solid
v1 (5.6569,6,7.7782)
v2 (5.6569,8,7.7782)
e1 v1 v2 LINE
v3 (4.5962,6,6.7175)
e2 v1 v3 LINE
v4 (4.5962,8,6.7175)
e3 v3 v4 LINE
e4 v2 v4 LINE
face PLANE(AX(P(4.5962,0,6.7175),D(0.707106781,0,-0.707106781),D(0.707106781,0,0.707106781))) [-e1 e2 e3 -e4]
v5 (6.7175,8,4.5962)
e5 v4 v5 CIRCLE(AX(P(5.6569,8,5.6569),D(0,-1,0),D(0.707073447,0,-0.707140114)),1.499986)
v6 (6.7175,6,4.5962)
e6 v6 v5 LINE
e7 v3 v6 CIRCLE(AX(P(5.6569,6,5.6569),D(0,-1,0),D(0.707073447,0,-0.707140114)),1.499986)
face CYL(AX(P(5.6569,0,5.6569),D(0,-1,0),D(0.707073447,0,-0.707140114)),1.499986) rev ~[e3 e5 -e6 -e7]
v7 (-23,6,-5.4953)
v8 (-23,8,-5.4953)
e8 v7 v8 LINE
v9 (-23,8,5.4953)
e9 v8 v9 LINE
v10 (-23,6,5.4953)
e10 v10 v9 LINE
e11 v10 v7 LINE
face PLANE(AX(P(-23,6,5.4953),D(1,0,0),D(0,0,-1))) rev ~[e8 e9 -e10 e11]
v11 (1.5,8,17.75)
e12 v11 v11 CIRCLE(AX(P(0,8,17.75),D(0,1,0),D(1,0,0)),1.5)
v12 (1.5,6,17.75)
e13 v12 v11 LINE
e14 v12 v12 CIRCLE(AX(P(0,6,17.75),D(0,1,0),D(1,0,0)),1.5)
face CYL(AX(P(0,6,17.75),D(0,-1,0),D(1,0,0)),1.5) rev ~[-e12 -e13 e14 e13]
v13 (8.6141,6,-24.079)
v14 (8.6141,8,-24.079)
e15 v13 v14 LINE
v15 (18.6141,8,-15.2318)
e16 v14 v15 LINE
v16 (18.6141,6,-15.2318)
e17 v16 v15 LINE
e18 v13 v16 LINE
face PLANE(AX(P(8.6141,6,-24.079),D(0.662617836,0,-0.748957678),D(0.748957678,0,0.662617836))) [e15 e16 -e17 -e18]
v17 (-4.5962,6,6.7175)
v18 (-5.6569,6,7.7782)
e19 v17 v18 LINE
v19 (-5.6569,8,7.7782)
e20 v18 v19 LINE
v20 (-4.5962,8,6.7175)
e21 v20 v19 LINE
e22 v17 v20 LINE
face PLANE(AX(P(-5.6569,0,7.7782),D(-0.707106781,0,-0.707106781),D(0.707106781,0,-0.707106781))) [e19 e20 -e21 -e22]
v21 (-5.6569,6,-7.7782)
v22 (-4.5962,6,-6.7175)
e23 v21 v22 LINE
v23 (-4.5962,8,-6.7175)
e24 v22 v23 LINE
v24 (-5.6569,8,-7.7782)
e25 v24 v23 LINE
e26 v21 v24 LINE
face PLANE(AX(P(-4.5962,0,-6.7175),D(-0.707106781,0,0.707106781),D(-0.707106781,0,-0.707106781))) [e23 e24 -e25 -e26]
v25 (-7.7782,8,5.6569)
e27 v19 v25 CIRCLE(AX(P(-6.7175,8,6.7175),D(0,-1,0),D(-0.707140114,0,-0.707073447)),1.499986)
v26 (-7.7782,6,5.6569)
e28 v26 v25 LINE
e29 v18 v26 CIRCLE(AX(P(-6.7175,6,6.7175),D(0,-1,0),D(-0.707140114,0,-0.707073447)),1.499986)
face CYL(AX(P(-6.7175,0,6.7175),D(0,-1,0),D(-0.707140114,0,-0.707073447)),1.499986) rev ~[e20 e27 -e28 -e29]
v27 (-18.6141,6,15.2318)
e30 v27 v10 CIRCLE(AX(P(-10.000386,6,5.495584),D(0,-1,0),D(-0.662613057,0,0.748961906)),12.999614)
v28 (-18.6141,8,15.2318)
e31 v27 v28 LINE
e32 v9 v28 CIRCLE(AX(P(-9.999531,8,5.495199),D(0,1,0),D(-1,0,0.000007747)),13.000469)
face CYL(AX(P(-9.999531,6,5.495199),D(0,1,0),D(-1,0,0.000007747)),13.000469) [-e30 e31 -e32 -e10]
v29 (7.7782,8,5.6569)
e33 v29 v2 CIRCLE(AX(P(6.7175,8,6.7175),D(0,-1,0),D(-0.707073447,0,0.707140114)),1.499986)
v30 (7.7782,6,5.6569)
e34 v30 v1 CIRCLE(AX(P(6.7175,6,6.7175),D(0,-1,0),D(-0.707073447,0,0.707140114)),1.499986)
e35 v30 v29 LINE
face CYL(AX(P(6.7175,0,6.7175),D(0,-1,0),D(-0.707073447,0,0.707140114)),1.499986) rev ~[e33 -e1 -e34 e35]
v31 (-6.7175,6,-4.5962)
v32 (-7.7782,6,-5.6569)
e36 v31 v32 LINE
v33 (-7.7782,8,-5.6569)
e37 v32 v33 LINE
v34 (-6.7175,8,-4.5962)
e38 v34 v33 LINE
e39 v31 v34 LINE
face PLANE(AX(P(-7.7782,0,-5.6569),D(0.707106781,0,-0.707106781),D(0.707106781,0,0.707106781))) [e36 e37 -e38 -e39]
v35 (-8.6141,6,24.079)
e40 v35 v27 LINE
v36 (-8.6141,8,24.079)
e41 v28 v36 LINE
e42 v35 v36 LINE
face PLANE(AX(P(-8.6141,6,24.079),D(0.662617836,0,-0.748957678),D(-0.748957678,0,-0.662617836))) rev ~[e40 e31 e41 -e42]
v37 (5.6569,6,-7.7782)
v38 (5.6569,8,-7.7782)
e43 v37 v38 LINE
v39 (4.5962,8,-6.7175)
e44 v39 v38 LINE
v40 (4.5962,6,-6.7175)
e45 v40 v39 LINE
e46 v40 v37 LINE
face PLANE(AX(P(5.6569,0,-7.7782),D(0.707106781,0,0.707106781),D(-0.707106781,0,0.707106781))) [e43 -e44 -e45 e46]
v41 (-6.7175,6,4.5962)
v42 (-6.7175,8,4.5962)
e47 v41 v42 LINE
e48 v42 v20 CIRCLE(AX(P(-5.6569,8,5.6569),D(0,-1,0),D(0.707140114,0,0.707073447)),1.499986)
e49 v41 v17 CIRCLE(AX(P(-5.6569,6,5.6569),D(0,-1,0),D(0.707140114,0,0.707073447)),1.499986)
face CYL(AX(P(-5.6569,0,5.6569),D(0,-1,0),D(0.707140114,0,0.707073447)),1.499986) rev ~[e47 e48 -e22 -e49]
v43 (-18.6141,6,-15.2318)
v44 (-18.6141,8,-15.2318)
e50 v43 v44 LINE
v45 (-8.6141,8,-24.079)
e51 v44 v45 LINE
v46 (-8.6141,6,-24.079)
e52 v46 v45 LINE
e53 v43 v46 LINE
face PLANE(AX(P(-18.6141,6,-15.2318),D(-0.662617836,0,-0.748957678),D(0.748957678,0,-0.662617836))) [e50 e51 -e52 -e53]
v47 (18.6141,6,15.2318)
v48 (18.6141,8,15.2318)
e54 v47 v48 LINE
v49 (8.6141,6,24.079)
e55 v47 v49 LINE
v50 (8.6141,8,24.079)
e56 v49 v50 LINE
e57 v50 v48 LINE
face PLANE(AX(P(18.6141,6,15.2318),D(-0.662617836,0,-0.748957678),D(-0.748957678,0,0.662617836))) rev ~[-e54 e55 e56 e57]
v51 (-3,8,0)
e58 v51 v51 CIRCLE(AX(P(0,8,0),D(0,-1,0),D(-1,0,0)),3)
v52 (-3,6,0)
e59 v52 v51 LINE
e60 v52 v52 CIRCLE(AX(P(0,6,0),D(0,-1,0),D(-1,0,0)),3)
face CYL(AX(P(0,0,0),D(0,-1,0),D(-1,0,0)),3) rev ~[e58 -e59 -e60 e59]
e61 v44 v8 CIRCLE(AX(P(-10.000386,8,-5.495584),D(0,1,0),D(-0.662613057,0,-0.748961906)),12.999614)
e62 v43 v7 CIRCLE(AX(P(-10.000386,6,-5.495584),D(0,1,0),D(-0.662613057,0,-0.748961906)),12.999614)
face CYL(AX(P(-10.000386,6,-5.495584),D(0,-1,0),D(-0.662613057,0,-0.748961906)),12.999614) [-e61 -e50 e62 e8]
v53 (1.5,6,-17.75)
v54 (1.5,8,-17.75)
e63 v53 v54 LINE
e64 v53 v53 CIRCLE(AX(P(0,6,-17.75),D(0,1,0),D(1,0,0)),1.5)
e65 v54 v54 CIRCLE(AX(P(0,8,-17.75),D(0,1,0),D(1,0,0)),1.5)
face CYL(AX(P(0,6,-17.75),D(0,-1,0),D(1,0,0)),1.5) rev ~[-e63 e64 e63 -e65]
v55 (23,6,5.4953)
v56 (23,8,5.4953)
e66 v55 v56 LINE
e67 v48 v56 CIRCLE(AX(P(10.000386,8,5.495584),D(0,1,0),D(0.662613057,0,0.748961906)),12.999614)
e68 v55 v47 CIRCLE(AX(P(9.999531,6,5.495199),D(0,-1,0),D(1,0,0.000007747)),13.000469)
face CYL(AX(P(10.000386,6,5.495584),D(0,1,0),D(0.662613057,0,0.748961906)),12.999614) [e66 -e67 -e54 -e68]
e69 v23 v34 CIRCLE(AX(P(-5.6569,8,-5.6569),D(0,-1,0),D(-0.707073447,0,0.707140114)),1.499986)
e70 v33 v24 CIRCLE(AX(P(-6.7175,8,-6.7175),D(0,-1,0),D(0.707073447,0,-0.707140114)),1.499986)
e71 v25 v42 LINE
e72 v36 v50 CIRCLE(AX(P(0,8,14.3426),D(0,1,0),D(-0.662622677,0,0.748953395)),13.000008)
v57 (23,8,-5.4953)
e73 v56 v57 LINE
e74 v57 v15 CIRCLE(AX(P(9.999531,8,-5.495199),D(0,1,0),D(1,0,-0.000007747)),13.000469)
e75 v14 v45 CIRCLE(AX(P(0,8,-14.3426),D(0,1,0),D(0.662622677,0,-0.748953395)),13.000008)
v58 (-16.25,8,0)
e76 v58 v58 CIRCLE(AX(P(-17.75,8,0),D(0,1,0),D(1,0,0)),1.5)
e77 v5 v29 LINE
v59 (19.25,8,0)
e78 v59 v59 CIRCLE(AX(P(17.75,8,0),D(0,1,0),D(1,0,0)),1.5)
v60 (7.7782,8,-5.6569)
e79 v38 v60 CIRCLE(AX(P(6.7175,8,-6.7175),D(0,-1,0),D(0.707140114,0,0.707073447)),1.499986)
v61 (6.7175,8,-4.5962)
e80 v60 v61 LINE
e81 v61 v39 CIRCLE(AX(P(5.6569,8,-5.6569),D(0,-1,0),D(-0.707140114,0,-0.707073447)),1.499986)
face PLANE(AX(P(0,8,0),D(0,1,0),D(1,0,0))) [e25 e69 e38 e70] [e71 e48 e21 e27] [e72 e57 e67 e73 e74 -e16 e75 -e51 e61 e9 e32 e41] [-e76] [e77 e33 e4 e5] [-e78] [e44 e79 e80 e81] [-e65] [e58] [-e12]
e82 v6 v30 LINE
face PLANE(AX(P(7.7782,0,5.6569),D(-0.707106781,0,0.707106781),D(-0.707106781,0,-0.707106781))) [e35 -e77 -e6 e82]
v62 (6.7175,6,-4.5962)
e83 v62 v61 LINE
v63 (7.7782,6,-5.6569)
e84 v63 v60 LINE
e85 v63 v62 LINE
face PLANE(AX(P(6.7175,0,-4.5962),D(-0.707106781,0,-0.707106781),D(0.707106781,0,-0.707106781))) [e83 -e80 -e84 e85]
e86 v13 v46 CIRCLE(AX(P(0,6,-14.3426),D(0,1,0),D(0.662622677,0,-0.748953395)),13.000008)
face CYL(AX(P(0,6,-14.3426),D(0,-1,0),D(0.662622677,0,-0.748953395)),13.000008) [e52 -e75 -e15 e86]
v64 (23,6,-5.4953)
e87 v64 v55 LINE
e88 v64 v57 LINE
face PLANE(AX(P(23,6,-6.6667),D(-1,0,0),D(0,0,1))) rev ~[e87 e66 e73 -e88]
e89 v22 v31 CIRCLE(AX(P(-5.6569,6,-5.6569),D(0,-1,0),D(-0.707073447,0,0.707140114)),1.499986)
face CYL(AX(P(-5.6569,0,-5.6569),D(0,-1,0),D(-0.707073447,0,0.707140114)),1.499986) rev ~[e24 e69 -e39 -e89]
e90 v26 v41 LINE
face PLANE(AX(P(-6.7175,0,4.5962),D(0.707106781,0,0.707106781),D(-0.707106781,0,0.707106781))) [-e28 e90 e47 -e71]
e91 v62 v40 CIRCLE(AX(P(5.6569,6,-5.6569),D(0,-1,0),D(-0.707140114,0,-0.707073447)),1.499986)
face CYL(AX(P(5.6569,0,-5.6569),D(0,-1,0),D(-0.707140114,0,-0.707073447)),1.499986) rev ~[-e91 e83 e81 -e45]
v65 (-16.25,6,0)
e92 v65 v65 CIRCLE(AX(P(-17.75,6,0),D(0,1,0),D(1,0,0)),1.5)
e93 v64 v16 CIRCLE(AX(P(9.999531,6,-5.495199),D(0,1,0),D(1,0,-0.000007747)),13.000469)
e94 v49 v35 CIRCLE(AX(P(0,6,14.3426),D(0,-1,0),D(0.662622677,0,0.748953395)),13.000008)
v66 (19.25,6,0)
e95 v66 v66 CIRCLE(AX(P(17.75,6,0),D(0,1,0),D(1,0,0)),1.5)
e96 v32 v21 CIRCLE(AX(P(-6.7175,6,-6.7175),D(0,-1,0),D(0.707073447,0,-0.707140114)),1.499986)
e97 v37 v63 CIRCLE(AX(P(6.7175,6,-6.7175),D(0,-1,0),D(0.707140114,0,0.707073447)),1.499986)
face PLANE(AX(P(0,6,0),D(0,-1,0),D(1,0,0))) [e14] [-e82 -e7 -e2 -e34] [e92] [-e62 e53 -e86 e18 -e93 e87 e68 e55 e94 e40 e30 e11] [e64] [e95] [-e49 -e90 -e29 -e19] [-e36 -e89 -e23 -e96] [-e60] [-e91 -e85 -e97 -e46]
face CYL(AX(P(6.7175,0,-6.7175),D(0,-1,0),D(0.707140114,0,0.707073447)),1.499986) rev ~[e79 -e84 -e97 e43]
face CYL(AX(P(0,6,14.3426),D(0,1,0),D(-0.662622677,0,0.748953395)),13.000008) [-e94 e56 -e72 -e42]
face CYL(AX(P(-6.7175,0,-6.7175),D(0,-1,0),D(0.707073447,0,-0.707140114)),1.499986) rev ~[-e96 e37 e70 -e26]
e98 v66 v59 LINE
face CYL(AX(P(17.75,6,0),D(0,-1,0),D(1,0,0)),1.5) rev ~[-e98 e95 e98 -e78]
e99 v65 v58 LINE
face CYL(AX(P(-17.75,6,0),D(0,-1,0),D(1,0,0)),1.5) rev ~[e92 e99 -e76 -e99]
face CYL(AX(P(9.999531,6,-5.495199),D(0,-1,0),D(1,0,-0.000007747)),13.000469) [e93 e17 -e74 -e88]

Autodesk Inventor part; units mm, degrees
ref_plane "YZ Plane" through (0, 0, 0) normal (1, 0, 0) x (0, 1, 0)
ref_plane "XZ Plane" through (0, 0, 0) normal (0, 1, 0) x (-1, 0, 0)
ref_plane "XY Plane" through (0, 0, 0) normal (0, 0, 1) x (1, 0, 0)
sketch "Sketch1" plane through (0, 0, 0) normal (0, 1, 0) x (-1, 0, 0)
  arc A0 (4.5962, 6.7175) -> (6.7175, 4.5962) centre (5.6569, 5.6569) ccw
  line L0 (5.6569, 7.7782) -> (4.5962, 6.7175)
  arc A1 (7.7782, 5.6569) -> (5.6569, 7.7782) centre (6.7175, 6.7175) ccw
  line L1 (6.7175, 4.5962) -> (7.7782, 5.6569)
  circle A2 centre (0, 0) radius 3
  circle A3 centre (0, -124.0736) radius 1.5
  circle A4 centre (0, -145.2868) radius 4
  arc A5 (-4.5962, -6.7175) -> (-6.7175, -4.5962) centre (-5.6569, -5.6569) ccw
  line L2 (-5.6569, -7.7782) -> (-4.5962, -6.7175)
  arc A6 (-7.7782, -5.6569) -> (-5.6569, -7.7782) centre (-6.7175, -6.7175) ccw
  line L3 (-6.7175, -4.5962) -> (-7.7782, -5.6569)
  line L4 (-20, 5.4953) -> (-20, -6.6667)
  arc A7 (-20, -6.6667) -> (-18, -12.6667) centre (-10, -6.6667) ccw
  line L5 (-18, -12.6667) -> (-14.5, -17.3333)
  arc A8 (-12.5, -23.3333) -> (-14.5, -17.3333) centre (-22.5, -23.3333) ccw
  line L6 (-12.5, -23.3333) -> (-12.5, -134.321)
  arc A9 (-12.5, -134.321) -> (-12.2297, -138.6622) centre (22.5, -134.321) ccw
  line L7 (-12.2297, -138.6622) -> (-10, -156.5)
  line L8 (-10, -156.5) -> (-10, -166.5)
  line L9 (-10, -166.5) -> (0, -166.5)
  line L10 (0, -166.5) -> (0, -156.5)
  line L11 (0, -156.5) -> (10, -156.5)
  line L12 (10, -156.5) -> (12.2297, -138.6622)
  arc A10 (12.2297, -138.6622) -> (12.5, -134.321) centre (-22.5, -134.321) ccw
  line L13 (12.5, -134.321) -> (12.5, -23.3333)
  arc A11 (14.5, -17.3333) -> (12.5, -23.3333) centre (22.5, -23.3333) ccw
  line L14 (14.5, -17.3333) -> (18, -12.6667)
  arc A12 (18, -12.6667) -> (20, -6.6667) centre (10, -6.6667) ccw
  line L15 (20, -6.6667) -> (20, 5.4953)
  arc A13 (20, 5.4953) -> (16.6262, 12.9849) centre (10, 5.4953) ccw
  line L16 (16.6262, 12.9849) -> (6.6262, 21.8321)
  arc A14 (6.6262, 21.8321) -> (-6.6262, 21.8321) centre (0, 14.3426) ccw
  line L17 (-6.6262, 21.8321) -> (-16.6262, 12.9849)
  arc A15 (-16.6262, 12.9849) -> (-20, 5.4953) centre (-10, 5.4953) ccw
  arc A16 (-6.7175, 4.5962) -> (-4.5962, 6.7175) centre (-5.6569, 5.6569) ccw
  line L18 (-7.7782, 5.6569) -> (-6.7175, 4.5962)
  arc A17 (-5.6569, 7.7782) -> (-7.7782, 5.6569) centre (-6.7175, 6.7175) ccw
  line L19 (-4.5962, 6.7175) -> (-5.6569, 7.7782)
  arc A18 (6.7175, -4.5962) -> (4.5962, -6.7175) centre (5.6569, -5.6569) ccw
  line L20 (7.7782, -5.6569) -> (6.7175, -4.5962)
  arc A19 (5.6569, -7.7782) -> (7.7782, -5.6569) centre (6.7175, -6.7175) ccw
  line L21 (4.5962, -6.7175) -> (5.6569, -7.7782)
  circle A20 centre (6, -136.5) radius 1.5
  circle A21 centre (-6, -136.5) radius 1.5
  point P0 (18, -12.6667)
  point P1 (16.6262, 12.9849)
  point P2 (6.6262, 21.8321)
  point P3 (-6.6262, 21.8321)
  point P4 (-16.6262, 12.9849)
  point P5 (-18, -12.6667)
  point P6 (-14.5, -17.3333)
  point P7 (-12.5, -23.3333)
  point P8 (-12.5, -134.321)
  point P9 (-12.2297, -138.6622)
  point P10 (12.2297, -138.6622)
  point P11 (12.5, -134.321)
  point P12 (12.5, -23.3333)
  point P13 (14.5, -17.3333)
  point P14 (-6.7175, -4.5962)
  point P15 (-4.5962, -6.7175)
  point P16 (-5.6569, -7.7782)
  point P17 (-7.7782, -5.6569)
  point P18 (7.7782, 5.6569)
  point P19 (6.7175, 4.5962)
  point P20 (4.5962, 6.7175)
  point P21 (5.6569, 7.7782)
  point P22 (-5.6569, 7.7782)
  point P23 (-4.5962, 6.7175)
  point P24 (-6.7175, 4.5962)
  point P25 (-7.7782, 5.6569)
  point P26 (6.7175, -4.5962)
  point P27 (7.7782, -5.6569)
  point P28 (5.6569, -7.7782)
  point P29 (4.5962, -6.7175)
extrude "Extrusion1" add sketch "Sketch1" along normal blind 6
sketch "Sketch2" plane through (0, 6, 0) normal (0, 1, 0) x (1, 0, 0)
  line L0 (20, -5.4953) -> (20, 6.6667) projected
  arc A0 (20, 6.6667) -> (18, 12.6667) centre (10, 6.6667) ccw projected
  line L1 (18, 12.6667) -> (14.5, 17.3333) projected
  arc A1 (12.5, 23.3333) -> (14.5, 17.3333) centre (22.5, 23.3333) ccw projected
  line L2 (12.5, 23.3333) -> (12.5, 134.321) projected
  arc A2 (12.5, 134.321) -> (12.2297, 138.6622) centre (-22.5, 134.321) ccw projected
  line L3 (12.2297, 138.6622) -> (10, 156.5) projected
  line L4 (10, 156.5) -> (10, 166.5) projected
  line L5 (10, 166.5) -> (0, 166.5) projected
  line L6 (0, 166.5) -> (0, 156.5) projected
  line L7 (0, 156.5) -> (-10, 156.5) projected
  line L8 (-10, 156.5) -> (-12.2297, 138.6622) projected
  arc A3 (-12.2297, 138.6622) -> (-12.5, 134.321) centre (22.5, 134.321) ccw projected
  line L9 (-12.5, 134.321) -> (-12.5, 23.3333) projected
  arc A4 (-14.5, 17.3333) -> (-12.5, 23.3333) centre (-22.5, 23.3333) ccw projected
  line L10 (-14.5, 17.3333) -> (-18, 12.6667) projected
  arc A5 (-18, 12.6667) -> (-20, 6.6667) centre (-10, 6.6667) ccw projected
  line L11 (-20, 6.6667) -> (-20, -5.4953) projected
  arc A6 (-20, -5.4953) -> (-16.6262, -12.9849) centre (-10, -5.4953) ccw projected
  line L12 (-16.6262, -12.9849) -> (-6.6262, -21.8321) projected
  arc A7 (-6.6262, -21.8321) -> (6.6262, -21.8321) centre (0, -14.3426) ccw projected
  line L13 (6.6262, -21.8321) -> (16.6262, -12.9849) projected
  arc A8 (16.6262, -12.9849) -> (20, -5.4953) centre (10, -5.4953) ccw projected
  circle A9 centre (0, 0) radius 3 projected
  circle A10 centre (0, 145.2868) radius 4 projected
  circle A11 centre (-6, 136.5) radius 1.5 projected
  circle A12 centre (6, 136.5) radius 1.5 projected
  circle A13 centre (0, 124.0736) radius 1.5 projected
  line L14 (7.7782, 5.6569) -> (6.7175, 4.5962) projected
  arc A14 (4.5962, 6.7175) -> (6.7175, 4.5962) centre (5.6569, 5.6569) ccw projected
  line L15 (4.5962, 6.7175) -> (5.6569, 7.7782) projected
  arc A15 (7.7782, 5.6569) -> (5.6569, 7.7782) centre (6.7175, 6.7175) ccw projected
  line L16 (-7.7782, -5.6569) -> (-6.7175, -4.5962) projected
  arc A16 (-4.5962, -6.7175) -> (-6.7175, -4.5962) centre (-5.6569, -5.6569) ccw projected
  line L17 (-4.5962, -6.7175) -> (-5.6569, -7.7782) projected
  arc A17 (-7.7782, -5.6569) -> (-5.6569, -7.7782) centre (-6.7175, -6.7175) ccw projected
  arc A18 (5.6569, -7.7782) -> (7.7782, -5.6569) centre (6.7175, -6.7175) ccw projected
  line L18 (5.6569, -7.7782) -> (4.5962, -6.7175) projected
  arc A19 (6.7175, -4.5962) -> (4.5962, -6.7175) centre (5.6569, -5.6569) ccw projected
  line L19 (6.7175, -4.5962) -> (7.7782, -5.6569) projected
  line L20 (-6.7175, 4.5962) -> (-7.7782, 5.6569) projected
  arc A20 (-5.6569, 7.7782) -> (-7.7782, 5.6569) centre (-6.7175, 6.7175) ccw projected
  line L21 (-5.6569, 7.7782) -> (-4.5962, 6.7175) projected
  arc A21 (-6.7175, 4.5962) -> (-4.5962, 6.7175) centre (-5.6569, 5.6569) ccw projected
  line L22 (18.6141, -15.2318) -> (8.6141, -24.079)
  arc A22 (-8.6141, -24.079) -> (8.6141, -24.079) centre (0, -14.3426) ccw
  line L23 (-8.6141, -24.079) -> (-18.6141, -15.2318)
  arc A23 (-23, -5.4953) -> (-18.6141, -15.2318) centre (-10, -5.4953) ccw
  line L24 (-23, -5.4953) -> (-23, 6.6667)
  arc A24 (-20.4, 14.4667) -> (-23, 6.6667) centre (-10, 6.6667) ccw
  line L25 (-20.4, 14.4667) -> (-12.5, 25)
  line L26 (-15.5, 23.3333) -> (-15.5, 134.321)
  arc A25 (-15.2066, 139.0343) -> (-15.5, 134.321) centre (22.5, 134.321) ccw
  line L27 (-15.2066, 139.0343) -> (-12.6483, 159.5)
  line L28 (-12.6483, 159.5) -> (-3, 159.5)
  line L29 (-3, 159.5) -> (-3, 169.5)
  line L30 (-3, 169.5) -> (13, 169.5)
  line L31 (13, 169.5) -> (13, 156.6868)
  line L32 (13, 156.6868) -> (15.2066, 139.0343)
  arc A26 (15.5, 134.321) -> (15.2066, 139.0343) centre (-22.5, 134.321) ccw
  line L33 (15.5, 134.321) -> (15.5, 23.3333)
  line L34 (12.5, 25) -> (20.4, 14.4667)
  arc A27 (23, 6.6667) -> (20.4, 14.4667) centre (10, 6.6667) ccw
  line L35 (23, 6.6667) -> (23, -5.4953)
  arc A28 (18.6141, -15.2318) -> (23, -5.4953) centre (10, -5.4953) ccw
  dimension "d2" = 3
extrude "Extrusion2" add sketch "Sketch2" against normal blind 6 contours L0 A0 L1 A1 L2 L34 A27 L35 A28 L22 A22 L23 A23 L24 A24 L25 L9 A4 L10 A5 L11 A6 L12 A7 L13 A8
sketch "Sketch3" plane through (0, 6, 0) normal (0, 1, 0) x (1, 0, 0)
  line L0 (12.5, 25) -> (12.5, 134.321) projected
  arc A0 (12.5, 134.321) -> (12.2297, 138.6622) centre (-22.5, 134.321) ccw projected
  line L1 (12.2297, 138.6622) -> (10, 156.5) projected
  line L2 (10, 156.5) -> (10, 166.5) projected
  line L3 (10, 166.5) -> (0, 166.5) projected
  line L4 (0, 166.5) -> (0, 156.5) projected
  line L5 (0, 156.5) -> (-10, 156.5) projected
  line L6 (-10, 156.5) -> (-12.2297, 138.6622) projected
  arc A1 (-12.2297, 138.6622) -> (-12.5, 134.321) centre (22.5, 134.321) ccw projected
  line L7 (-12.5, 134.321) -> (-12.5, 25) projected
  circle A2 centre (0, 0) radius 3 projected
  circle A3 centre (0, 145.2868) radius 4 projected
  circle A4 centre (-6, 136.5) radius 1.5 projected
  circle A5 centre (6, 136.5) radius 1.5 projected
  circle A6 centre (0, 124.0736) radius 1.5 projected
  line L8 (7.7782, 5.6569) -> (6.7175, 4.5962) projected
  arc A7 (4.5962, 6.7175) -> (6.7175, 4.5962) centre (5.6569, 5.6569) ccw projected
  line L9 (4.5962, 6.7175) -> (5.6569, 7.7782) projected
  arc A8 (7.7782, 5.6569) -> (5.6569, 7.7782) centre (6.7175, 6.7175) ccw projected
  line L10 (-7.7782, -5.6569) -> (-6.7175, -4.5962) projected
  arc A9 (-4.5962, -6.7175) -> (-6.7175, -4.5962) centre (-5.6569, -5.6569) ccw projected
  line L11 (-4.5962, -6.7175) -> (-5.6569, -7.7782) projected
  arc A10 (-7.7782, -5.6569) -> (-5.6569, -7.7782) centre (-6.7175, -6.7175) ccw projected
  arc A11 (5.6569, -7.7782) -> (7.7782, -5.6569) centre (6.7175, -6.7175) ccw projected
  line L12 (5.6569, -7.7782) -> (4.5962, -6.7175) projected
  arc A12 (6.7175, -4.5962) -> (4.5962, -6.7175) centre (5.6569, -5.6569) ccw projected
  line L13 (6.7175, -4.5962) -> (7.7782, -5.6569) projected
  line L14 (-6.7175, 4.5962) -> (-7.7782, 5.6569) projected
  arc A13 (-5.6569, 7.7782) -> (-7.7782, 5.6569) centre (-6.7175, 6.7175) ccw projected
  line L15 (-5.6569, 7.7782) -> (-4.5962, 6.7175) projected
  arc A14 (-6.7175, 4.5962) -> (-4.5962, 6.7175) centre (-5.6569, 5.6569) ccw projected
  line L16 (-12.5, 25) -> (-20.4, 14.4667) projected
  arc A15 (-20.4, 14.4667) -> (-23, 6.6667) centre (-10, 6.6667) ccw projected
  line L17 (-23, 6.6667) -> (-23, -5.4953) projected
  arc A16 (-23, -5.4953) -> (-18.6141, -15.2318) centre (-10, -5.4953) ccw projected
  line L18 (-18.6141, -15.2318) -> (-8.6141, -24.079) projected
  arc A17 (-8.6141, -24.079) -> (8.6141, -24.079) centre (0, -14.3426) ccw projected
  line L19 (8.6141, -24.079) -> (18.6141, -15.2318) projected
  arc A18 (18.6141, -15.2318) -> (23, -5.4953) centre (10, -5.4953) ccw projected
  line L20 (23, -5.4953) -> (23, 6.6667) projected
  arc A19 (23, 6.6667) -> (20.4, 14.4667) centre (10, 6.6667) ccw projected
  line L21 (20.4, 14.4667) -> (12.5, 25) projected
  circle A20 centre (-6.7175, -6.7175) radius 3 construction
  line L22 (0, 0) -> (-8.8388, -8.8388) construction
  circle A21 centre (0, 0) radius 12.5
  dimension "d8" = 6
fillet "Fillet1" radius 10 2 edges at (12.5, 3, -25) (-12.5, 3, -25)
extrude "Extrusion3" cut sketch "Sketch3" against normal blind 6 contours A21
sketch "Sketch4" plane through (0, 6, 0) normal (0, 1, 0) x (1, 0, 0)
  circle A0 centre (0, 0) radius 12.5 construction
  circle A1 centre (0, 0) radius 12.5 construction
  line L0 (12.5, 0) -> (23, 0) construction
  line L1 (23, -5.4953) -> (23, 6.6667) construction
  circle A2 centre (0, 0) radius 17.75 construction
  line L2 (0, -12.5) -> (0, -17.75) construction
  line L3 (-12.5, 0) -> (-17.75, 0) construction
  line L4 (0, 12.5) -> (0, 17.75) construction
  circle A3 centre (17.75, 0) radius 1.5
  circle A4 centre (0, 17.75) radius 1.5
  circle A5 centre (-17.75, 0) radius 1.5
  circle A6 centre (0, -17.75) radius 1.5
  dimension "d11" = 3
  dimension "d14" = 360
extrude "Extrusion4" cut sketch "Sketch4" against normal up to next
sketch "Sketch5" plane through (0, 6, 0) normal (0, 1, 0) x (1, 0, 0)
  circle A0 centre (0, -17.75) radius 1.5 projected
  circle A1 centre (17.75, 0) radius 1.5 projected
  circle A2 centre (-17.75, 0) radius 1.5 projected
  circle A3 centre (0, 17.75) radius 1.5 projected
  circle A4 centre (0, 0) radius 12.5 projected
  line L0 (12.5, 28.3333) -> (12.5, 134.321) projected
  arc A5 (12.5, 134.321) -> (12.2297, 138.6622) centre (-22.5, 134.321) ccw projected
  line L1 (12.2297, 138.6622) -> (10, 156.5) projected
  line L2 (10, 156.5) -> (10, 166.5) projected
  line L3 (10, 166.5) -> (0, 166.5) projected
  line L4 (0, 166.5) -> (0, 156.5) projected
  line L5 (0, 156.5) -> (-10, 156.5) projected
  line L6 (-10, 156.5) -> (-12.2297, 138.6622) projected
  arc A6 (-12.2297, 138.6622) -> (-12.5, 134.321) centre (22.5, 134.321) ccw projected
  line L7 (-12.5, 134.321) -> (-12.5, 28.3333) projected
  arc A7 (-14.5, 22.3333) -> (-12.5, 28.3333) centre (-22.5, 28.3333) ccw projected
  line L8 (-14.5, 22.3333) -> (-20.4, 14.4667) projected
  arc A8 (-20.4, 14.4667) -> (-23, 6.6667) centre (-10, 6.6667) ccw projected
  line L9 (-23, 6.6667) -> (-23, -5.4953) projected
  arc A9 (-23, -5.4953) -> (-18.6141, -15.2318) centre (-10, -5.4953) ccw projected
  line L10 (-18.6141, -15.2318) -> (-8.6141, -24.079) projected
  arc A10 (-8.6141, -24.079) -> (8.6141, -24.079) centre (0, -14.3426) ccw projected
  line L11 (8.6141, -24.079) -> (18.6141, -15.2318) projected
  arc A11 (18.6141, -15.2318) -> (23, -5.4953) centre (10, -5.4953) ccw projected
  line L12 (23, -5.4953) -> (23, 6.6667) projected
  arc A12 (23, 6.6667) -> (20.4, 14.4667) centre (10, 6.6667) ccw projected
  line L13 (20.4, 14.4667) -> (14.5, 22.3333) projected
  arc A13 (12.5, 28.3333) -> (14.5, 22.3333) centre (22.5, 28.3333) ccw projected
  circle A14 centre (0, 145.2868) radius 4 projected
  circle A15 centre (-6, 136.5) radius 1.5 projected
  circle A16 centre (6, 136.5) radius 1.5 projected
  circle A17 centre (0, 124.0736) radius 1.5 projected
  circle A18 centre (17.75, 0) radius 1.5 construction
  circle A19 centre (-17.75, 0) radius 1.5 construction
  line L14 (17.75, 0) -> (-17.75, 0) construction
  circle A20 centre (0, 17.75) radius 1.5
  arc A21 (-18.6141, 15.2318) -> (-23, 5.4953) centre (-10, 5.4953) ccw
  line L15 (-18.6141, 15.2318) -> (-8.6141, 24.079)
  arc A22 (8.6141, 24.079) -> (-8.6141, 24.079) centre (0, 14.3426) ccw
  line L16 (8.6141, 24.079) -> (18.6141, 15.2318)
  arc A23 (23, 5.4953) -> (18.6141, 15.2318) centre (10, 5.4953) ccw
  point P0 (-23, 5.4953)
  point P1 (23, 5.4953)
extrude "Extrusion5" add sketch "Sketch5" along normal blind 2 contours A4 | L12 A11 L11 A10 L10 A9 L9 A21 L15 A22 L16 A23
extrude "Extrusion6" cut sketch "Sketch1" along normal through all contours L0 A1 L1 A0 | A2 | L2 A6 L3 A5 | L18 A17 L19 A16 | L20 A19 L21 A18
sketch "Sketch6" plane through (0, 0, 0) normal (0, -1, 0) x (1, 0, 0)
  circle A0 centre (0, 17.75) radius 1.5 projected
  circle A1 centre (17.75, 0) radius 1.5 projected
  circle A2 centre (-17.75, 0) radius 1.5 projected
  circle A3 centre (0, -17.75) radius 1.5 projected
  circle A4 centre (0, 0) radius 12.5 projected
  line L0 (14.5, -22.3333) -> (20.4, -14.4667) projected
  arc A5 (20.4, -14.4667) -> (23, -6.6667) centre (10, -6.6667) ccw projected
  line L1 (23, -6.6667) -> (23, 5.4953) projected
  arc A6 (23, 5.4953) -> (18.6141, 15.2318) centre (10, 5.4953) ccw projected
  line L2 (18.6141, 15.2318) -> (8.6141, 24.079) projected
  arc A7 (8.6141, 24.079) -> (-8.6141, 24.079) centre (0, 14.3426) ccw projected
  line L3 (-8.6141, 24.079) -> (-18.6141, 15.2318) projected
  arc A8 (-18.6141, 15.2318) -> (-23, 5.4953) centre (-10, 5.4953) ccw projected
  line L4 (-23, 5.4953) -> (-23, -6.6667) projected
  arc A9 (-23, -6.6667) -> (-20.4, -14.4667) centre (-10, -6.6667) ccw projected
  line L5 (-20.4, -14.4667) -> (-14.5, -22.3333) projected
  arc A10 (-12.5, -28.3333) -> (-14.5, -22.3333) centre (-22.5, -28.3333) ccw projected
  line L6 (-12.5, -134.321) -> (-12.5, -28.3333) projected
  arc A11 (-12.5, -134.321) -> (-12.2297, -138.6622) centre (22.5, -134.321) ccw projected
  line L7 (-10, -156.5) -> (-12.2297, -138.6622) projected
  line L8 (0, -156.5) -> (-10, -156.5) projected
  line L9 (0, -166.5) -> (0, -156.5) projected
  line L10 (10, -166.5) -> (0, -166.5) projected
  line L11 (10, -156.5) -> (10, -166.5) projected
  line L12 (12.2297, -138.6622) -> (10, -156.5) projected
  arc A12 (12.2297, -138.6622) -> (12.5, -134.321) centre (-22.5, -134.321) ccw projected
  line L13 (12.5, -28.3333) -> (12.5, -134.321) projected
  arc A13 (14.5, -22.3333) -> (12.5, -28.3333) centre (22.5, -28.3333) ccw projected
  circle A14 centre (0, -145.2868) radius 4 projected
  circle A15 centre (-6, -136.5) radius 1.5 projected
  circle A16 centre (6, -136.5) radius 1.5 projected
  circle A17 centre (0, -124.0736) radius 1.5 projected
extrude "Extrusion7" cut sketch "Sketch6" against normal blind 6
sketch "Sketch7" plane through (0, 6, 0) normal (0, -1, 0) x (1, 0, 0)
  point P0 (0, 0)
sketch "Sketch8" plane through (0, 6, 0) normal (0, -1, 0) x (1, 0, 0)
  circle A0 centre (0, 0) radius 12.5 projected
  arc A1 (18.6141, -15.2318) -> (23, -5.4953) centre (10, -5.4953) ccw projected
  line L0 (23, 5.4953) -> (23, -5.4953) projected
  arc A2 (23, 5.4953) -> (18.6141, 15.2318) centre (10, 5.4953) ccw projected
  line L1 (8.6141, 24.079) -> (18.6141, 15.2318) projected
  arc A3 (8.6141, 24.079) -> (-8.6141, 24.079) centre (0, 14.3426) ccw projected
  line L2 (-18.6141, 15.2318) -> (-8.6141, 24.079) projected
  arc A4 (-18.6141, 15.2318) -> (-23, 5.4953) centre (-10, 5.4953) ccw projected
  line L3 (-23, -5.4953) -> (-23, 5.4953) projected
  arc A5 (-23, -5.4953) -> (-18.6141, -15.2318) centre (-10, -5.4953) ccw projected
  line L4 (-18.6141, -15.2318) -> (-8.6141, -24.079) projected
  arc A6 (-8.6141, -24.079) -> (8.6141, -24.079) centre (0, -14.3426) ccw projected
  line L5 (8.6141, -24.079) -> (18.6141, -15.2318) projected
  circle A7 centre (0, 17.75) radius 1.5 projected
  circle A8 centre (17.75, 0) radius 1.5 projected
  circle A9 centre (-17.75, 0) radius 1.5 projected
  circle A10 centre (0, -17.75) radius 1.5 projected
  line L6 (-5.6569, 7.7782) -> (-4.5962, 6.7175) projected
  arc A11 (-6.7175, 4.5962) -> (-4.5962, 6.7175) centre (-5.6569, 5.6569) ccw projected
  line L7 (-6.7175, 4.5962) -> (-7.7782, 5.6569) projected
  arc A12 (-5.6569, 7.7782) -> (-7.7782, 5.6569) centre (-6.7175, 6.7175) ccw projected
  line L8 (-7.7782, -5.6569) -> (-6.7175, -4.5962) projected
  arc A13 (-4.5962, -6.7175) -> (-6.7175, -4.5962) centre (-5.6569, -5.6569) ccw projected
  line L9 (-4.5962, -6.7175) -> (-5.6569, -7.7782) projected
  arc A14 (-7.7782, -5.6569) -> (-5.6569, -7.7782) centre (-6.7175, -6.7175) ccw projected
  line L10 (4.5962, 6.7175) -> (5.6569, 7.7782) projected
  arc A15 (7.7782, 5.6569) -> (5.6569, 7.7782) centre (6.7175, 6.7175) ccw projected
  line L11 (7.7782, 5.6569) -> (6.7175, 4.5962) projected
  arc A16 (4.5962, 6.7175) -> (6.7175, 4.5962) centre (5.6569, 5.6569) ccw projected
  line L12 (6.7175, -4.5962) -> (7.7782, -5.6569) projected
  arc A17 (5.6569, -7.7782) -> (7.7782, -5.6569) centre (6.7175, -6.7175) ccw projected
  line L13 (5.6569, -7.7782) -> (4.5962, -6.7175) projected
  arc A18 (6.7175, -4.5962) -> (4.5962, -6.7175) centre (5.6569, -5.6569) ccw projected
  circle A19 centre (0, 0) radius 3 projected
  arc A20 (18.6141, -15.2318) -> (23, -5.4953) centre (10, -5.4953) ccw projected
  line L14 (23, 5.4953) -> (23, -5.4953) projected
  arc A21 (23, 5.4953) -> (18.6141, 15.2318) centre (10, 5.4953) ccw projected
  line L15 (8.6141, 24.079) -> (18.6141, 15.2318) projected
  arc A22 (8.6141, 24.079) -> (-8.6141, 24.079) centre (0, 14.3426) ccw projected
  line L16 (-18.6141, 15.2318) -> (-8.6141, 24.079) projected
  arc A23 (-18.6141, 15.2318) -> (-23, 5.4953) centre (-10, 5.4953) ccw projected
  line L17 (-23, -5.4953) -> (-23, 5.4953) projected
  arc A24 (-23, -5.4953) -> (-18.6141, -15.2318) centre (-10, -5.4953) ccw projected
  line L18 (-18.6141, -15.2318) -> (-8.6141, -24.079) projected
  arc A25 (-8.6141, -24.079) -> (8.6141, -24.079) centre (0, -14.3426) ccw projected
  line L19 (8.6141, -24.079) -> (18.6141, -15.2318) projected
  circle A26 centre (0, 17.75) radius 1.5 projected
  circle A27 centre (17.75, 0) radius 1.5 projected
  circle A28 centre (-17.75, 0) radius 1.5 projected
  circle A29 centre (0, -17.75) radius 1.5 projected
  line L20 (-5.6569, 7.7782) -> (-4.5962, 6.7175) projected
  arc A30 (-6.7175, 4.5962) -> (-4.5962, 6.7175) centre (-5.6569, 5.6569) ccw projected
  line L21 (-6.7175, 4.5962) -> (-7.7782, 5.6569) projected
  arc A31 (-5.6569, 7.7782) -> (-7.7782, 5.6569) centre (-6.7175, 6.7175) ccw projected
  line L22 (-7.7782, -5.6569) -> (-6.7175, -4.5962) projected
  arc A32 (-4.5962, -6.7175) -> (-6.7175, -4.5962) centre (-5.6569, -5.6569) ccw projected
  line L23 (-4.5962, -6.7175) -> (-5.6569, -7.7782) projected
  arc A33 (-7.7782, -5.6569) -> (-5.6569, -7.7782) centre (-6.7175, -6.7175) ccw projected
  line L24 (4.5962, 6.7175) -> (5.6569, 7.7782) projected
  arc A34 (7.7782, 5.6569) -> (5.6569, 7.7782) centre (6.7175, 6.7175) ccw projected
  line L25 (7.7782, 5.6569) -> (6.7175, 4.5962) projected
  arc A35 (4.5962, 6.7175) -> (6.7175, 4.5962) centre (5.6569, 5.6569) ccw projected
  line L26 (6.7175, -4.5962) -> (7.7782, -5.6569) projected
  arc A36 (5.6569, -7.7782) -> (7.7782, -5.6569) centre (6.7175, -6.7175) ccw projected
  line L27 (5.6569, -7.7782) -> (4.5962, -6.7175) projected
  arc A37 (6.7175, -4.5962) -> (4.5962, -6.7175) centre (5.6569, -5.6569) ccw projected
  circle A38 centre (0, 0) radius 3 projected
extrude "Extrusion8" [suppressed]
properties part number "mod arm plate" material "Thermoplastic Resin"
